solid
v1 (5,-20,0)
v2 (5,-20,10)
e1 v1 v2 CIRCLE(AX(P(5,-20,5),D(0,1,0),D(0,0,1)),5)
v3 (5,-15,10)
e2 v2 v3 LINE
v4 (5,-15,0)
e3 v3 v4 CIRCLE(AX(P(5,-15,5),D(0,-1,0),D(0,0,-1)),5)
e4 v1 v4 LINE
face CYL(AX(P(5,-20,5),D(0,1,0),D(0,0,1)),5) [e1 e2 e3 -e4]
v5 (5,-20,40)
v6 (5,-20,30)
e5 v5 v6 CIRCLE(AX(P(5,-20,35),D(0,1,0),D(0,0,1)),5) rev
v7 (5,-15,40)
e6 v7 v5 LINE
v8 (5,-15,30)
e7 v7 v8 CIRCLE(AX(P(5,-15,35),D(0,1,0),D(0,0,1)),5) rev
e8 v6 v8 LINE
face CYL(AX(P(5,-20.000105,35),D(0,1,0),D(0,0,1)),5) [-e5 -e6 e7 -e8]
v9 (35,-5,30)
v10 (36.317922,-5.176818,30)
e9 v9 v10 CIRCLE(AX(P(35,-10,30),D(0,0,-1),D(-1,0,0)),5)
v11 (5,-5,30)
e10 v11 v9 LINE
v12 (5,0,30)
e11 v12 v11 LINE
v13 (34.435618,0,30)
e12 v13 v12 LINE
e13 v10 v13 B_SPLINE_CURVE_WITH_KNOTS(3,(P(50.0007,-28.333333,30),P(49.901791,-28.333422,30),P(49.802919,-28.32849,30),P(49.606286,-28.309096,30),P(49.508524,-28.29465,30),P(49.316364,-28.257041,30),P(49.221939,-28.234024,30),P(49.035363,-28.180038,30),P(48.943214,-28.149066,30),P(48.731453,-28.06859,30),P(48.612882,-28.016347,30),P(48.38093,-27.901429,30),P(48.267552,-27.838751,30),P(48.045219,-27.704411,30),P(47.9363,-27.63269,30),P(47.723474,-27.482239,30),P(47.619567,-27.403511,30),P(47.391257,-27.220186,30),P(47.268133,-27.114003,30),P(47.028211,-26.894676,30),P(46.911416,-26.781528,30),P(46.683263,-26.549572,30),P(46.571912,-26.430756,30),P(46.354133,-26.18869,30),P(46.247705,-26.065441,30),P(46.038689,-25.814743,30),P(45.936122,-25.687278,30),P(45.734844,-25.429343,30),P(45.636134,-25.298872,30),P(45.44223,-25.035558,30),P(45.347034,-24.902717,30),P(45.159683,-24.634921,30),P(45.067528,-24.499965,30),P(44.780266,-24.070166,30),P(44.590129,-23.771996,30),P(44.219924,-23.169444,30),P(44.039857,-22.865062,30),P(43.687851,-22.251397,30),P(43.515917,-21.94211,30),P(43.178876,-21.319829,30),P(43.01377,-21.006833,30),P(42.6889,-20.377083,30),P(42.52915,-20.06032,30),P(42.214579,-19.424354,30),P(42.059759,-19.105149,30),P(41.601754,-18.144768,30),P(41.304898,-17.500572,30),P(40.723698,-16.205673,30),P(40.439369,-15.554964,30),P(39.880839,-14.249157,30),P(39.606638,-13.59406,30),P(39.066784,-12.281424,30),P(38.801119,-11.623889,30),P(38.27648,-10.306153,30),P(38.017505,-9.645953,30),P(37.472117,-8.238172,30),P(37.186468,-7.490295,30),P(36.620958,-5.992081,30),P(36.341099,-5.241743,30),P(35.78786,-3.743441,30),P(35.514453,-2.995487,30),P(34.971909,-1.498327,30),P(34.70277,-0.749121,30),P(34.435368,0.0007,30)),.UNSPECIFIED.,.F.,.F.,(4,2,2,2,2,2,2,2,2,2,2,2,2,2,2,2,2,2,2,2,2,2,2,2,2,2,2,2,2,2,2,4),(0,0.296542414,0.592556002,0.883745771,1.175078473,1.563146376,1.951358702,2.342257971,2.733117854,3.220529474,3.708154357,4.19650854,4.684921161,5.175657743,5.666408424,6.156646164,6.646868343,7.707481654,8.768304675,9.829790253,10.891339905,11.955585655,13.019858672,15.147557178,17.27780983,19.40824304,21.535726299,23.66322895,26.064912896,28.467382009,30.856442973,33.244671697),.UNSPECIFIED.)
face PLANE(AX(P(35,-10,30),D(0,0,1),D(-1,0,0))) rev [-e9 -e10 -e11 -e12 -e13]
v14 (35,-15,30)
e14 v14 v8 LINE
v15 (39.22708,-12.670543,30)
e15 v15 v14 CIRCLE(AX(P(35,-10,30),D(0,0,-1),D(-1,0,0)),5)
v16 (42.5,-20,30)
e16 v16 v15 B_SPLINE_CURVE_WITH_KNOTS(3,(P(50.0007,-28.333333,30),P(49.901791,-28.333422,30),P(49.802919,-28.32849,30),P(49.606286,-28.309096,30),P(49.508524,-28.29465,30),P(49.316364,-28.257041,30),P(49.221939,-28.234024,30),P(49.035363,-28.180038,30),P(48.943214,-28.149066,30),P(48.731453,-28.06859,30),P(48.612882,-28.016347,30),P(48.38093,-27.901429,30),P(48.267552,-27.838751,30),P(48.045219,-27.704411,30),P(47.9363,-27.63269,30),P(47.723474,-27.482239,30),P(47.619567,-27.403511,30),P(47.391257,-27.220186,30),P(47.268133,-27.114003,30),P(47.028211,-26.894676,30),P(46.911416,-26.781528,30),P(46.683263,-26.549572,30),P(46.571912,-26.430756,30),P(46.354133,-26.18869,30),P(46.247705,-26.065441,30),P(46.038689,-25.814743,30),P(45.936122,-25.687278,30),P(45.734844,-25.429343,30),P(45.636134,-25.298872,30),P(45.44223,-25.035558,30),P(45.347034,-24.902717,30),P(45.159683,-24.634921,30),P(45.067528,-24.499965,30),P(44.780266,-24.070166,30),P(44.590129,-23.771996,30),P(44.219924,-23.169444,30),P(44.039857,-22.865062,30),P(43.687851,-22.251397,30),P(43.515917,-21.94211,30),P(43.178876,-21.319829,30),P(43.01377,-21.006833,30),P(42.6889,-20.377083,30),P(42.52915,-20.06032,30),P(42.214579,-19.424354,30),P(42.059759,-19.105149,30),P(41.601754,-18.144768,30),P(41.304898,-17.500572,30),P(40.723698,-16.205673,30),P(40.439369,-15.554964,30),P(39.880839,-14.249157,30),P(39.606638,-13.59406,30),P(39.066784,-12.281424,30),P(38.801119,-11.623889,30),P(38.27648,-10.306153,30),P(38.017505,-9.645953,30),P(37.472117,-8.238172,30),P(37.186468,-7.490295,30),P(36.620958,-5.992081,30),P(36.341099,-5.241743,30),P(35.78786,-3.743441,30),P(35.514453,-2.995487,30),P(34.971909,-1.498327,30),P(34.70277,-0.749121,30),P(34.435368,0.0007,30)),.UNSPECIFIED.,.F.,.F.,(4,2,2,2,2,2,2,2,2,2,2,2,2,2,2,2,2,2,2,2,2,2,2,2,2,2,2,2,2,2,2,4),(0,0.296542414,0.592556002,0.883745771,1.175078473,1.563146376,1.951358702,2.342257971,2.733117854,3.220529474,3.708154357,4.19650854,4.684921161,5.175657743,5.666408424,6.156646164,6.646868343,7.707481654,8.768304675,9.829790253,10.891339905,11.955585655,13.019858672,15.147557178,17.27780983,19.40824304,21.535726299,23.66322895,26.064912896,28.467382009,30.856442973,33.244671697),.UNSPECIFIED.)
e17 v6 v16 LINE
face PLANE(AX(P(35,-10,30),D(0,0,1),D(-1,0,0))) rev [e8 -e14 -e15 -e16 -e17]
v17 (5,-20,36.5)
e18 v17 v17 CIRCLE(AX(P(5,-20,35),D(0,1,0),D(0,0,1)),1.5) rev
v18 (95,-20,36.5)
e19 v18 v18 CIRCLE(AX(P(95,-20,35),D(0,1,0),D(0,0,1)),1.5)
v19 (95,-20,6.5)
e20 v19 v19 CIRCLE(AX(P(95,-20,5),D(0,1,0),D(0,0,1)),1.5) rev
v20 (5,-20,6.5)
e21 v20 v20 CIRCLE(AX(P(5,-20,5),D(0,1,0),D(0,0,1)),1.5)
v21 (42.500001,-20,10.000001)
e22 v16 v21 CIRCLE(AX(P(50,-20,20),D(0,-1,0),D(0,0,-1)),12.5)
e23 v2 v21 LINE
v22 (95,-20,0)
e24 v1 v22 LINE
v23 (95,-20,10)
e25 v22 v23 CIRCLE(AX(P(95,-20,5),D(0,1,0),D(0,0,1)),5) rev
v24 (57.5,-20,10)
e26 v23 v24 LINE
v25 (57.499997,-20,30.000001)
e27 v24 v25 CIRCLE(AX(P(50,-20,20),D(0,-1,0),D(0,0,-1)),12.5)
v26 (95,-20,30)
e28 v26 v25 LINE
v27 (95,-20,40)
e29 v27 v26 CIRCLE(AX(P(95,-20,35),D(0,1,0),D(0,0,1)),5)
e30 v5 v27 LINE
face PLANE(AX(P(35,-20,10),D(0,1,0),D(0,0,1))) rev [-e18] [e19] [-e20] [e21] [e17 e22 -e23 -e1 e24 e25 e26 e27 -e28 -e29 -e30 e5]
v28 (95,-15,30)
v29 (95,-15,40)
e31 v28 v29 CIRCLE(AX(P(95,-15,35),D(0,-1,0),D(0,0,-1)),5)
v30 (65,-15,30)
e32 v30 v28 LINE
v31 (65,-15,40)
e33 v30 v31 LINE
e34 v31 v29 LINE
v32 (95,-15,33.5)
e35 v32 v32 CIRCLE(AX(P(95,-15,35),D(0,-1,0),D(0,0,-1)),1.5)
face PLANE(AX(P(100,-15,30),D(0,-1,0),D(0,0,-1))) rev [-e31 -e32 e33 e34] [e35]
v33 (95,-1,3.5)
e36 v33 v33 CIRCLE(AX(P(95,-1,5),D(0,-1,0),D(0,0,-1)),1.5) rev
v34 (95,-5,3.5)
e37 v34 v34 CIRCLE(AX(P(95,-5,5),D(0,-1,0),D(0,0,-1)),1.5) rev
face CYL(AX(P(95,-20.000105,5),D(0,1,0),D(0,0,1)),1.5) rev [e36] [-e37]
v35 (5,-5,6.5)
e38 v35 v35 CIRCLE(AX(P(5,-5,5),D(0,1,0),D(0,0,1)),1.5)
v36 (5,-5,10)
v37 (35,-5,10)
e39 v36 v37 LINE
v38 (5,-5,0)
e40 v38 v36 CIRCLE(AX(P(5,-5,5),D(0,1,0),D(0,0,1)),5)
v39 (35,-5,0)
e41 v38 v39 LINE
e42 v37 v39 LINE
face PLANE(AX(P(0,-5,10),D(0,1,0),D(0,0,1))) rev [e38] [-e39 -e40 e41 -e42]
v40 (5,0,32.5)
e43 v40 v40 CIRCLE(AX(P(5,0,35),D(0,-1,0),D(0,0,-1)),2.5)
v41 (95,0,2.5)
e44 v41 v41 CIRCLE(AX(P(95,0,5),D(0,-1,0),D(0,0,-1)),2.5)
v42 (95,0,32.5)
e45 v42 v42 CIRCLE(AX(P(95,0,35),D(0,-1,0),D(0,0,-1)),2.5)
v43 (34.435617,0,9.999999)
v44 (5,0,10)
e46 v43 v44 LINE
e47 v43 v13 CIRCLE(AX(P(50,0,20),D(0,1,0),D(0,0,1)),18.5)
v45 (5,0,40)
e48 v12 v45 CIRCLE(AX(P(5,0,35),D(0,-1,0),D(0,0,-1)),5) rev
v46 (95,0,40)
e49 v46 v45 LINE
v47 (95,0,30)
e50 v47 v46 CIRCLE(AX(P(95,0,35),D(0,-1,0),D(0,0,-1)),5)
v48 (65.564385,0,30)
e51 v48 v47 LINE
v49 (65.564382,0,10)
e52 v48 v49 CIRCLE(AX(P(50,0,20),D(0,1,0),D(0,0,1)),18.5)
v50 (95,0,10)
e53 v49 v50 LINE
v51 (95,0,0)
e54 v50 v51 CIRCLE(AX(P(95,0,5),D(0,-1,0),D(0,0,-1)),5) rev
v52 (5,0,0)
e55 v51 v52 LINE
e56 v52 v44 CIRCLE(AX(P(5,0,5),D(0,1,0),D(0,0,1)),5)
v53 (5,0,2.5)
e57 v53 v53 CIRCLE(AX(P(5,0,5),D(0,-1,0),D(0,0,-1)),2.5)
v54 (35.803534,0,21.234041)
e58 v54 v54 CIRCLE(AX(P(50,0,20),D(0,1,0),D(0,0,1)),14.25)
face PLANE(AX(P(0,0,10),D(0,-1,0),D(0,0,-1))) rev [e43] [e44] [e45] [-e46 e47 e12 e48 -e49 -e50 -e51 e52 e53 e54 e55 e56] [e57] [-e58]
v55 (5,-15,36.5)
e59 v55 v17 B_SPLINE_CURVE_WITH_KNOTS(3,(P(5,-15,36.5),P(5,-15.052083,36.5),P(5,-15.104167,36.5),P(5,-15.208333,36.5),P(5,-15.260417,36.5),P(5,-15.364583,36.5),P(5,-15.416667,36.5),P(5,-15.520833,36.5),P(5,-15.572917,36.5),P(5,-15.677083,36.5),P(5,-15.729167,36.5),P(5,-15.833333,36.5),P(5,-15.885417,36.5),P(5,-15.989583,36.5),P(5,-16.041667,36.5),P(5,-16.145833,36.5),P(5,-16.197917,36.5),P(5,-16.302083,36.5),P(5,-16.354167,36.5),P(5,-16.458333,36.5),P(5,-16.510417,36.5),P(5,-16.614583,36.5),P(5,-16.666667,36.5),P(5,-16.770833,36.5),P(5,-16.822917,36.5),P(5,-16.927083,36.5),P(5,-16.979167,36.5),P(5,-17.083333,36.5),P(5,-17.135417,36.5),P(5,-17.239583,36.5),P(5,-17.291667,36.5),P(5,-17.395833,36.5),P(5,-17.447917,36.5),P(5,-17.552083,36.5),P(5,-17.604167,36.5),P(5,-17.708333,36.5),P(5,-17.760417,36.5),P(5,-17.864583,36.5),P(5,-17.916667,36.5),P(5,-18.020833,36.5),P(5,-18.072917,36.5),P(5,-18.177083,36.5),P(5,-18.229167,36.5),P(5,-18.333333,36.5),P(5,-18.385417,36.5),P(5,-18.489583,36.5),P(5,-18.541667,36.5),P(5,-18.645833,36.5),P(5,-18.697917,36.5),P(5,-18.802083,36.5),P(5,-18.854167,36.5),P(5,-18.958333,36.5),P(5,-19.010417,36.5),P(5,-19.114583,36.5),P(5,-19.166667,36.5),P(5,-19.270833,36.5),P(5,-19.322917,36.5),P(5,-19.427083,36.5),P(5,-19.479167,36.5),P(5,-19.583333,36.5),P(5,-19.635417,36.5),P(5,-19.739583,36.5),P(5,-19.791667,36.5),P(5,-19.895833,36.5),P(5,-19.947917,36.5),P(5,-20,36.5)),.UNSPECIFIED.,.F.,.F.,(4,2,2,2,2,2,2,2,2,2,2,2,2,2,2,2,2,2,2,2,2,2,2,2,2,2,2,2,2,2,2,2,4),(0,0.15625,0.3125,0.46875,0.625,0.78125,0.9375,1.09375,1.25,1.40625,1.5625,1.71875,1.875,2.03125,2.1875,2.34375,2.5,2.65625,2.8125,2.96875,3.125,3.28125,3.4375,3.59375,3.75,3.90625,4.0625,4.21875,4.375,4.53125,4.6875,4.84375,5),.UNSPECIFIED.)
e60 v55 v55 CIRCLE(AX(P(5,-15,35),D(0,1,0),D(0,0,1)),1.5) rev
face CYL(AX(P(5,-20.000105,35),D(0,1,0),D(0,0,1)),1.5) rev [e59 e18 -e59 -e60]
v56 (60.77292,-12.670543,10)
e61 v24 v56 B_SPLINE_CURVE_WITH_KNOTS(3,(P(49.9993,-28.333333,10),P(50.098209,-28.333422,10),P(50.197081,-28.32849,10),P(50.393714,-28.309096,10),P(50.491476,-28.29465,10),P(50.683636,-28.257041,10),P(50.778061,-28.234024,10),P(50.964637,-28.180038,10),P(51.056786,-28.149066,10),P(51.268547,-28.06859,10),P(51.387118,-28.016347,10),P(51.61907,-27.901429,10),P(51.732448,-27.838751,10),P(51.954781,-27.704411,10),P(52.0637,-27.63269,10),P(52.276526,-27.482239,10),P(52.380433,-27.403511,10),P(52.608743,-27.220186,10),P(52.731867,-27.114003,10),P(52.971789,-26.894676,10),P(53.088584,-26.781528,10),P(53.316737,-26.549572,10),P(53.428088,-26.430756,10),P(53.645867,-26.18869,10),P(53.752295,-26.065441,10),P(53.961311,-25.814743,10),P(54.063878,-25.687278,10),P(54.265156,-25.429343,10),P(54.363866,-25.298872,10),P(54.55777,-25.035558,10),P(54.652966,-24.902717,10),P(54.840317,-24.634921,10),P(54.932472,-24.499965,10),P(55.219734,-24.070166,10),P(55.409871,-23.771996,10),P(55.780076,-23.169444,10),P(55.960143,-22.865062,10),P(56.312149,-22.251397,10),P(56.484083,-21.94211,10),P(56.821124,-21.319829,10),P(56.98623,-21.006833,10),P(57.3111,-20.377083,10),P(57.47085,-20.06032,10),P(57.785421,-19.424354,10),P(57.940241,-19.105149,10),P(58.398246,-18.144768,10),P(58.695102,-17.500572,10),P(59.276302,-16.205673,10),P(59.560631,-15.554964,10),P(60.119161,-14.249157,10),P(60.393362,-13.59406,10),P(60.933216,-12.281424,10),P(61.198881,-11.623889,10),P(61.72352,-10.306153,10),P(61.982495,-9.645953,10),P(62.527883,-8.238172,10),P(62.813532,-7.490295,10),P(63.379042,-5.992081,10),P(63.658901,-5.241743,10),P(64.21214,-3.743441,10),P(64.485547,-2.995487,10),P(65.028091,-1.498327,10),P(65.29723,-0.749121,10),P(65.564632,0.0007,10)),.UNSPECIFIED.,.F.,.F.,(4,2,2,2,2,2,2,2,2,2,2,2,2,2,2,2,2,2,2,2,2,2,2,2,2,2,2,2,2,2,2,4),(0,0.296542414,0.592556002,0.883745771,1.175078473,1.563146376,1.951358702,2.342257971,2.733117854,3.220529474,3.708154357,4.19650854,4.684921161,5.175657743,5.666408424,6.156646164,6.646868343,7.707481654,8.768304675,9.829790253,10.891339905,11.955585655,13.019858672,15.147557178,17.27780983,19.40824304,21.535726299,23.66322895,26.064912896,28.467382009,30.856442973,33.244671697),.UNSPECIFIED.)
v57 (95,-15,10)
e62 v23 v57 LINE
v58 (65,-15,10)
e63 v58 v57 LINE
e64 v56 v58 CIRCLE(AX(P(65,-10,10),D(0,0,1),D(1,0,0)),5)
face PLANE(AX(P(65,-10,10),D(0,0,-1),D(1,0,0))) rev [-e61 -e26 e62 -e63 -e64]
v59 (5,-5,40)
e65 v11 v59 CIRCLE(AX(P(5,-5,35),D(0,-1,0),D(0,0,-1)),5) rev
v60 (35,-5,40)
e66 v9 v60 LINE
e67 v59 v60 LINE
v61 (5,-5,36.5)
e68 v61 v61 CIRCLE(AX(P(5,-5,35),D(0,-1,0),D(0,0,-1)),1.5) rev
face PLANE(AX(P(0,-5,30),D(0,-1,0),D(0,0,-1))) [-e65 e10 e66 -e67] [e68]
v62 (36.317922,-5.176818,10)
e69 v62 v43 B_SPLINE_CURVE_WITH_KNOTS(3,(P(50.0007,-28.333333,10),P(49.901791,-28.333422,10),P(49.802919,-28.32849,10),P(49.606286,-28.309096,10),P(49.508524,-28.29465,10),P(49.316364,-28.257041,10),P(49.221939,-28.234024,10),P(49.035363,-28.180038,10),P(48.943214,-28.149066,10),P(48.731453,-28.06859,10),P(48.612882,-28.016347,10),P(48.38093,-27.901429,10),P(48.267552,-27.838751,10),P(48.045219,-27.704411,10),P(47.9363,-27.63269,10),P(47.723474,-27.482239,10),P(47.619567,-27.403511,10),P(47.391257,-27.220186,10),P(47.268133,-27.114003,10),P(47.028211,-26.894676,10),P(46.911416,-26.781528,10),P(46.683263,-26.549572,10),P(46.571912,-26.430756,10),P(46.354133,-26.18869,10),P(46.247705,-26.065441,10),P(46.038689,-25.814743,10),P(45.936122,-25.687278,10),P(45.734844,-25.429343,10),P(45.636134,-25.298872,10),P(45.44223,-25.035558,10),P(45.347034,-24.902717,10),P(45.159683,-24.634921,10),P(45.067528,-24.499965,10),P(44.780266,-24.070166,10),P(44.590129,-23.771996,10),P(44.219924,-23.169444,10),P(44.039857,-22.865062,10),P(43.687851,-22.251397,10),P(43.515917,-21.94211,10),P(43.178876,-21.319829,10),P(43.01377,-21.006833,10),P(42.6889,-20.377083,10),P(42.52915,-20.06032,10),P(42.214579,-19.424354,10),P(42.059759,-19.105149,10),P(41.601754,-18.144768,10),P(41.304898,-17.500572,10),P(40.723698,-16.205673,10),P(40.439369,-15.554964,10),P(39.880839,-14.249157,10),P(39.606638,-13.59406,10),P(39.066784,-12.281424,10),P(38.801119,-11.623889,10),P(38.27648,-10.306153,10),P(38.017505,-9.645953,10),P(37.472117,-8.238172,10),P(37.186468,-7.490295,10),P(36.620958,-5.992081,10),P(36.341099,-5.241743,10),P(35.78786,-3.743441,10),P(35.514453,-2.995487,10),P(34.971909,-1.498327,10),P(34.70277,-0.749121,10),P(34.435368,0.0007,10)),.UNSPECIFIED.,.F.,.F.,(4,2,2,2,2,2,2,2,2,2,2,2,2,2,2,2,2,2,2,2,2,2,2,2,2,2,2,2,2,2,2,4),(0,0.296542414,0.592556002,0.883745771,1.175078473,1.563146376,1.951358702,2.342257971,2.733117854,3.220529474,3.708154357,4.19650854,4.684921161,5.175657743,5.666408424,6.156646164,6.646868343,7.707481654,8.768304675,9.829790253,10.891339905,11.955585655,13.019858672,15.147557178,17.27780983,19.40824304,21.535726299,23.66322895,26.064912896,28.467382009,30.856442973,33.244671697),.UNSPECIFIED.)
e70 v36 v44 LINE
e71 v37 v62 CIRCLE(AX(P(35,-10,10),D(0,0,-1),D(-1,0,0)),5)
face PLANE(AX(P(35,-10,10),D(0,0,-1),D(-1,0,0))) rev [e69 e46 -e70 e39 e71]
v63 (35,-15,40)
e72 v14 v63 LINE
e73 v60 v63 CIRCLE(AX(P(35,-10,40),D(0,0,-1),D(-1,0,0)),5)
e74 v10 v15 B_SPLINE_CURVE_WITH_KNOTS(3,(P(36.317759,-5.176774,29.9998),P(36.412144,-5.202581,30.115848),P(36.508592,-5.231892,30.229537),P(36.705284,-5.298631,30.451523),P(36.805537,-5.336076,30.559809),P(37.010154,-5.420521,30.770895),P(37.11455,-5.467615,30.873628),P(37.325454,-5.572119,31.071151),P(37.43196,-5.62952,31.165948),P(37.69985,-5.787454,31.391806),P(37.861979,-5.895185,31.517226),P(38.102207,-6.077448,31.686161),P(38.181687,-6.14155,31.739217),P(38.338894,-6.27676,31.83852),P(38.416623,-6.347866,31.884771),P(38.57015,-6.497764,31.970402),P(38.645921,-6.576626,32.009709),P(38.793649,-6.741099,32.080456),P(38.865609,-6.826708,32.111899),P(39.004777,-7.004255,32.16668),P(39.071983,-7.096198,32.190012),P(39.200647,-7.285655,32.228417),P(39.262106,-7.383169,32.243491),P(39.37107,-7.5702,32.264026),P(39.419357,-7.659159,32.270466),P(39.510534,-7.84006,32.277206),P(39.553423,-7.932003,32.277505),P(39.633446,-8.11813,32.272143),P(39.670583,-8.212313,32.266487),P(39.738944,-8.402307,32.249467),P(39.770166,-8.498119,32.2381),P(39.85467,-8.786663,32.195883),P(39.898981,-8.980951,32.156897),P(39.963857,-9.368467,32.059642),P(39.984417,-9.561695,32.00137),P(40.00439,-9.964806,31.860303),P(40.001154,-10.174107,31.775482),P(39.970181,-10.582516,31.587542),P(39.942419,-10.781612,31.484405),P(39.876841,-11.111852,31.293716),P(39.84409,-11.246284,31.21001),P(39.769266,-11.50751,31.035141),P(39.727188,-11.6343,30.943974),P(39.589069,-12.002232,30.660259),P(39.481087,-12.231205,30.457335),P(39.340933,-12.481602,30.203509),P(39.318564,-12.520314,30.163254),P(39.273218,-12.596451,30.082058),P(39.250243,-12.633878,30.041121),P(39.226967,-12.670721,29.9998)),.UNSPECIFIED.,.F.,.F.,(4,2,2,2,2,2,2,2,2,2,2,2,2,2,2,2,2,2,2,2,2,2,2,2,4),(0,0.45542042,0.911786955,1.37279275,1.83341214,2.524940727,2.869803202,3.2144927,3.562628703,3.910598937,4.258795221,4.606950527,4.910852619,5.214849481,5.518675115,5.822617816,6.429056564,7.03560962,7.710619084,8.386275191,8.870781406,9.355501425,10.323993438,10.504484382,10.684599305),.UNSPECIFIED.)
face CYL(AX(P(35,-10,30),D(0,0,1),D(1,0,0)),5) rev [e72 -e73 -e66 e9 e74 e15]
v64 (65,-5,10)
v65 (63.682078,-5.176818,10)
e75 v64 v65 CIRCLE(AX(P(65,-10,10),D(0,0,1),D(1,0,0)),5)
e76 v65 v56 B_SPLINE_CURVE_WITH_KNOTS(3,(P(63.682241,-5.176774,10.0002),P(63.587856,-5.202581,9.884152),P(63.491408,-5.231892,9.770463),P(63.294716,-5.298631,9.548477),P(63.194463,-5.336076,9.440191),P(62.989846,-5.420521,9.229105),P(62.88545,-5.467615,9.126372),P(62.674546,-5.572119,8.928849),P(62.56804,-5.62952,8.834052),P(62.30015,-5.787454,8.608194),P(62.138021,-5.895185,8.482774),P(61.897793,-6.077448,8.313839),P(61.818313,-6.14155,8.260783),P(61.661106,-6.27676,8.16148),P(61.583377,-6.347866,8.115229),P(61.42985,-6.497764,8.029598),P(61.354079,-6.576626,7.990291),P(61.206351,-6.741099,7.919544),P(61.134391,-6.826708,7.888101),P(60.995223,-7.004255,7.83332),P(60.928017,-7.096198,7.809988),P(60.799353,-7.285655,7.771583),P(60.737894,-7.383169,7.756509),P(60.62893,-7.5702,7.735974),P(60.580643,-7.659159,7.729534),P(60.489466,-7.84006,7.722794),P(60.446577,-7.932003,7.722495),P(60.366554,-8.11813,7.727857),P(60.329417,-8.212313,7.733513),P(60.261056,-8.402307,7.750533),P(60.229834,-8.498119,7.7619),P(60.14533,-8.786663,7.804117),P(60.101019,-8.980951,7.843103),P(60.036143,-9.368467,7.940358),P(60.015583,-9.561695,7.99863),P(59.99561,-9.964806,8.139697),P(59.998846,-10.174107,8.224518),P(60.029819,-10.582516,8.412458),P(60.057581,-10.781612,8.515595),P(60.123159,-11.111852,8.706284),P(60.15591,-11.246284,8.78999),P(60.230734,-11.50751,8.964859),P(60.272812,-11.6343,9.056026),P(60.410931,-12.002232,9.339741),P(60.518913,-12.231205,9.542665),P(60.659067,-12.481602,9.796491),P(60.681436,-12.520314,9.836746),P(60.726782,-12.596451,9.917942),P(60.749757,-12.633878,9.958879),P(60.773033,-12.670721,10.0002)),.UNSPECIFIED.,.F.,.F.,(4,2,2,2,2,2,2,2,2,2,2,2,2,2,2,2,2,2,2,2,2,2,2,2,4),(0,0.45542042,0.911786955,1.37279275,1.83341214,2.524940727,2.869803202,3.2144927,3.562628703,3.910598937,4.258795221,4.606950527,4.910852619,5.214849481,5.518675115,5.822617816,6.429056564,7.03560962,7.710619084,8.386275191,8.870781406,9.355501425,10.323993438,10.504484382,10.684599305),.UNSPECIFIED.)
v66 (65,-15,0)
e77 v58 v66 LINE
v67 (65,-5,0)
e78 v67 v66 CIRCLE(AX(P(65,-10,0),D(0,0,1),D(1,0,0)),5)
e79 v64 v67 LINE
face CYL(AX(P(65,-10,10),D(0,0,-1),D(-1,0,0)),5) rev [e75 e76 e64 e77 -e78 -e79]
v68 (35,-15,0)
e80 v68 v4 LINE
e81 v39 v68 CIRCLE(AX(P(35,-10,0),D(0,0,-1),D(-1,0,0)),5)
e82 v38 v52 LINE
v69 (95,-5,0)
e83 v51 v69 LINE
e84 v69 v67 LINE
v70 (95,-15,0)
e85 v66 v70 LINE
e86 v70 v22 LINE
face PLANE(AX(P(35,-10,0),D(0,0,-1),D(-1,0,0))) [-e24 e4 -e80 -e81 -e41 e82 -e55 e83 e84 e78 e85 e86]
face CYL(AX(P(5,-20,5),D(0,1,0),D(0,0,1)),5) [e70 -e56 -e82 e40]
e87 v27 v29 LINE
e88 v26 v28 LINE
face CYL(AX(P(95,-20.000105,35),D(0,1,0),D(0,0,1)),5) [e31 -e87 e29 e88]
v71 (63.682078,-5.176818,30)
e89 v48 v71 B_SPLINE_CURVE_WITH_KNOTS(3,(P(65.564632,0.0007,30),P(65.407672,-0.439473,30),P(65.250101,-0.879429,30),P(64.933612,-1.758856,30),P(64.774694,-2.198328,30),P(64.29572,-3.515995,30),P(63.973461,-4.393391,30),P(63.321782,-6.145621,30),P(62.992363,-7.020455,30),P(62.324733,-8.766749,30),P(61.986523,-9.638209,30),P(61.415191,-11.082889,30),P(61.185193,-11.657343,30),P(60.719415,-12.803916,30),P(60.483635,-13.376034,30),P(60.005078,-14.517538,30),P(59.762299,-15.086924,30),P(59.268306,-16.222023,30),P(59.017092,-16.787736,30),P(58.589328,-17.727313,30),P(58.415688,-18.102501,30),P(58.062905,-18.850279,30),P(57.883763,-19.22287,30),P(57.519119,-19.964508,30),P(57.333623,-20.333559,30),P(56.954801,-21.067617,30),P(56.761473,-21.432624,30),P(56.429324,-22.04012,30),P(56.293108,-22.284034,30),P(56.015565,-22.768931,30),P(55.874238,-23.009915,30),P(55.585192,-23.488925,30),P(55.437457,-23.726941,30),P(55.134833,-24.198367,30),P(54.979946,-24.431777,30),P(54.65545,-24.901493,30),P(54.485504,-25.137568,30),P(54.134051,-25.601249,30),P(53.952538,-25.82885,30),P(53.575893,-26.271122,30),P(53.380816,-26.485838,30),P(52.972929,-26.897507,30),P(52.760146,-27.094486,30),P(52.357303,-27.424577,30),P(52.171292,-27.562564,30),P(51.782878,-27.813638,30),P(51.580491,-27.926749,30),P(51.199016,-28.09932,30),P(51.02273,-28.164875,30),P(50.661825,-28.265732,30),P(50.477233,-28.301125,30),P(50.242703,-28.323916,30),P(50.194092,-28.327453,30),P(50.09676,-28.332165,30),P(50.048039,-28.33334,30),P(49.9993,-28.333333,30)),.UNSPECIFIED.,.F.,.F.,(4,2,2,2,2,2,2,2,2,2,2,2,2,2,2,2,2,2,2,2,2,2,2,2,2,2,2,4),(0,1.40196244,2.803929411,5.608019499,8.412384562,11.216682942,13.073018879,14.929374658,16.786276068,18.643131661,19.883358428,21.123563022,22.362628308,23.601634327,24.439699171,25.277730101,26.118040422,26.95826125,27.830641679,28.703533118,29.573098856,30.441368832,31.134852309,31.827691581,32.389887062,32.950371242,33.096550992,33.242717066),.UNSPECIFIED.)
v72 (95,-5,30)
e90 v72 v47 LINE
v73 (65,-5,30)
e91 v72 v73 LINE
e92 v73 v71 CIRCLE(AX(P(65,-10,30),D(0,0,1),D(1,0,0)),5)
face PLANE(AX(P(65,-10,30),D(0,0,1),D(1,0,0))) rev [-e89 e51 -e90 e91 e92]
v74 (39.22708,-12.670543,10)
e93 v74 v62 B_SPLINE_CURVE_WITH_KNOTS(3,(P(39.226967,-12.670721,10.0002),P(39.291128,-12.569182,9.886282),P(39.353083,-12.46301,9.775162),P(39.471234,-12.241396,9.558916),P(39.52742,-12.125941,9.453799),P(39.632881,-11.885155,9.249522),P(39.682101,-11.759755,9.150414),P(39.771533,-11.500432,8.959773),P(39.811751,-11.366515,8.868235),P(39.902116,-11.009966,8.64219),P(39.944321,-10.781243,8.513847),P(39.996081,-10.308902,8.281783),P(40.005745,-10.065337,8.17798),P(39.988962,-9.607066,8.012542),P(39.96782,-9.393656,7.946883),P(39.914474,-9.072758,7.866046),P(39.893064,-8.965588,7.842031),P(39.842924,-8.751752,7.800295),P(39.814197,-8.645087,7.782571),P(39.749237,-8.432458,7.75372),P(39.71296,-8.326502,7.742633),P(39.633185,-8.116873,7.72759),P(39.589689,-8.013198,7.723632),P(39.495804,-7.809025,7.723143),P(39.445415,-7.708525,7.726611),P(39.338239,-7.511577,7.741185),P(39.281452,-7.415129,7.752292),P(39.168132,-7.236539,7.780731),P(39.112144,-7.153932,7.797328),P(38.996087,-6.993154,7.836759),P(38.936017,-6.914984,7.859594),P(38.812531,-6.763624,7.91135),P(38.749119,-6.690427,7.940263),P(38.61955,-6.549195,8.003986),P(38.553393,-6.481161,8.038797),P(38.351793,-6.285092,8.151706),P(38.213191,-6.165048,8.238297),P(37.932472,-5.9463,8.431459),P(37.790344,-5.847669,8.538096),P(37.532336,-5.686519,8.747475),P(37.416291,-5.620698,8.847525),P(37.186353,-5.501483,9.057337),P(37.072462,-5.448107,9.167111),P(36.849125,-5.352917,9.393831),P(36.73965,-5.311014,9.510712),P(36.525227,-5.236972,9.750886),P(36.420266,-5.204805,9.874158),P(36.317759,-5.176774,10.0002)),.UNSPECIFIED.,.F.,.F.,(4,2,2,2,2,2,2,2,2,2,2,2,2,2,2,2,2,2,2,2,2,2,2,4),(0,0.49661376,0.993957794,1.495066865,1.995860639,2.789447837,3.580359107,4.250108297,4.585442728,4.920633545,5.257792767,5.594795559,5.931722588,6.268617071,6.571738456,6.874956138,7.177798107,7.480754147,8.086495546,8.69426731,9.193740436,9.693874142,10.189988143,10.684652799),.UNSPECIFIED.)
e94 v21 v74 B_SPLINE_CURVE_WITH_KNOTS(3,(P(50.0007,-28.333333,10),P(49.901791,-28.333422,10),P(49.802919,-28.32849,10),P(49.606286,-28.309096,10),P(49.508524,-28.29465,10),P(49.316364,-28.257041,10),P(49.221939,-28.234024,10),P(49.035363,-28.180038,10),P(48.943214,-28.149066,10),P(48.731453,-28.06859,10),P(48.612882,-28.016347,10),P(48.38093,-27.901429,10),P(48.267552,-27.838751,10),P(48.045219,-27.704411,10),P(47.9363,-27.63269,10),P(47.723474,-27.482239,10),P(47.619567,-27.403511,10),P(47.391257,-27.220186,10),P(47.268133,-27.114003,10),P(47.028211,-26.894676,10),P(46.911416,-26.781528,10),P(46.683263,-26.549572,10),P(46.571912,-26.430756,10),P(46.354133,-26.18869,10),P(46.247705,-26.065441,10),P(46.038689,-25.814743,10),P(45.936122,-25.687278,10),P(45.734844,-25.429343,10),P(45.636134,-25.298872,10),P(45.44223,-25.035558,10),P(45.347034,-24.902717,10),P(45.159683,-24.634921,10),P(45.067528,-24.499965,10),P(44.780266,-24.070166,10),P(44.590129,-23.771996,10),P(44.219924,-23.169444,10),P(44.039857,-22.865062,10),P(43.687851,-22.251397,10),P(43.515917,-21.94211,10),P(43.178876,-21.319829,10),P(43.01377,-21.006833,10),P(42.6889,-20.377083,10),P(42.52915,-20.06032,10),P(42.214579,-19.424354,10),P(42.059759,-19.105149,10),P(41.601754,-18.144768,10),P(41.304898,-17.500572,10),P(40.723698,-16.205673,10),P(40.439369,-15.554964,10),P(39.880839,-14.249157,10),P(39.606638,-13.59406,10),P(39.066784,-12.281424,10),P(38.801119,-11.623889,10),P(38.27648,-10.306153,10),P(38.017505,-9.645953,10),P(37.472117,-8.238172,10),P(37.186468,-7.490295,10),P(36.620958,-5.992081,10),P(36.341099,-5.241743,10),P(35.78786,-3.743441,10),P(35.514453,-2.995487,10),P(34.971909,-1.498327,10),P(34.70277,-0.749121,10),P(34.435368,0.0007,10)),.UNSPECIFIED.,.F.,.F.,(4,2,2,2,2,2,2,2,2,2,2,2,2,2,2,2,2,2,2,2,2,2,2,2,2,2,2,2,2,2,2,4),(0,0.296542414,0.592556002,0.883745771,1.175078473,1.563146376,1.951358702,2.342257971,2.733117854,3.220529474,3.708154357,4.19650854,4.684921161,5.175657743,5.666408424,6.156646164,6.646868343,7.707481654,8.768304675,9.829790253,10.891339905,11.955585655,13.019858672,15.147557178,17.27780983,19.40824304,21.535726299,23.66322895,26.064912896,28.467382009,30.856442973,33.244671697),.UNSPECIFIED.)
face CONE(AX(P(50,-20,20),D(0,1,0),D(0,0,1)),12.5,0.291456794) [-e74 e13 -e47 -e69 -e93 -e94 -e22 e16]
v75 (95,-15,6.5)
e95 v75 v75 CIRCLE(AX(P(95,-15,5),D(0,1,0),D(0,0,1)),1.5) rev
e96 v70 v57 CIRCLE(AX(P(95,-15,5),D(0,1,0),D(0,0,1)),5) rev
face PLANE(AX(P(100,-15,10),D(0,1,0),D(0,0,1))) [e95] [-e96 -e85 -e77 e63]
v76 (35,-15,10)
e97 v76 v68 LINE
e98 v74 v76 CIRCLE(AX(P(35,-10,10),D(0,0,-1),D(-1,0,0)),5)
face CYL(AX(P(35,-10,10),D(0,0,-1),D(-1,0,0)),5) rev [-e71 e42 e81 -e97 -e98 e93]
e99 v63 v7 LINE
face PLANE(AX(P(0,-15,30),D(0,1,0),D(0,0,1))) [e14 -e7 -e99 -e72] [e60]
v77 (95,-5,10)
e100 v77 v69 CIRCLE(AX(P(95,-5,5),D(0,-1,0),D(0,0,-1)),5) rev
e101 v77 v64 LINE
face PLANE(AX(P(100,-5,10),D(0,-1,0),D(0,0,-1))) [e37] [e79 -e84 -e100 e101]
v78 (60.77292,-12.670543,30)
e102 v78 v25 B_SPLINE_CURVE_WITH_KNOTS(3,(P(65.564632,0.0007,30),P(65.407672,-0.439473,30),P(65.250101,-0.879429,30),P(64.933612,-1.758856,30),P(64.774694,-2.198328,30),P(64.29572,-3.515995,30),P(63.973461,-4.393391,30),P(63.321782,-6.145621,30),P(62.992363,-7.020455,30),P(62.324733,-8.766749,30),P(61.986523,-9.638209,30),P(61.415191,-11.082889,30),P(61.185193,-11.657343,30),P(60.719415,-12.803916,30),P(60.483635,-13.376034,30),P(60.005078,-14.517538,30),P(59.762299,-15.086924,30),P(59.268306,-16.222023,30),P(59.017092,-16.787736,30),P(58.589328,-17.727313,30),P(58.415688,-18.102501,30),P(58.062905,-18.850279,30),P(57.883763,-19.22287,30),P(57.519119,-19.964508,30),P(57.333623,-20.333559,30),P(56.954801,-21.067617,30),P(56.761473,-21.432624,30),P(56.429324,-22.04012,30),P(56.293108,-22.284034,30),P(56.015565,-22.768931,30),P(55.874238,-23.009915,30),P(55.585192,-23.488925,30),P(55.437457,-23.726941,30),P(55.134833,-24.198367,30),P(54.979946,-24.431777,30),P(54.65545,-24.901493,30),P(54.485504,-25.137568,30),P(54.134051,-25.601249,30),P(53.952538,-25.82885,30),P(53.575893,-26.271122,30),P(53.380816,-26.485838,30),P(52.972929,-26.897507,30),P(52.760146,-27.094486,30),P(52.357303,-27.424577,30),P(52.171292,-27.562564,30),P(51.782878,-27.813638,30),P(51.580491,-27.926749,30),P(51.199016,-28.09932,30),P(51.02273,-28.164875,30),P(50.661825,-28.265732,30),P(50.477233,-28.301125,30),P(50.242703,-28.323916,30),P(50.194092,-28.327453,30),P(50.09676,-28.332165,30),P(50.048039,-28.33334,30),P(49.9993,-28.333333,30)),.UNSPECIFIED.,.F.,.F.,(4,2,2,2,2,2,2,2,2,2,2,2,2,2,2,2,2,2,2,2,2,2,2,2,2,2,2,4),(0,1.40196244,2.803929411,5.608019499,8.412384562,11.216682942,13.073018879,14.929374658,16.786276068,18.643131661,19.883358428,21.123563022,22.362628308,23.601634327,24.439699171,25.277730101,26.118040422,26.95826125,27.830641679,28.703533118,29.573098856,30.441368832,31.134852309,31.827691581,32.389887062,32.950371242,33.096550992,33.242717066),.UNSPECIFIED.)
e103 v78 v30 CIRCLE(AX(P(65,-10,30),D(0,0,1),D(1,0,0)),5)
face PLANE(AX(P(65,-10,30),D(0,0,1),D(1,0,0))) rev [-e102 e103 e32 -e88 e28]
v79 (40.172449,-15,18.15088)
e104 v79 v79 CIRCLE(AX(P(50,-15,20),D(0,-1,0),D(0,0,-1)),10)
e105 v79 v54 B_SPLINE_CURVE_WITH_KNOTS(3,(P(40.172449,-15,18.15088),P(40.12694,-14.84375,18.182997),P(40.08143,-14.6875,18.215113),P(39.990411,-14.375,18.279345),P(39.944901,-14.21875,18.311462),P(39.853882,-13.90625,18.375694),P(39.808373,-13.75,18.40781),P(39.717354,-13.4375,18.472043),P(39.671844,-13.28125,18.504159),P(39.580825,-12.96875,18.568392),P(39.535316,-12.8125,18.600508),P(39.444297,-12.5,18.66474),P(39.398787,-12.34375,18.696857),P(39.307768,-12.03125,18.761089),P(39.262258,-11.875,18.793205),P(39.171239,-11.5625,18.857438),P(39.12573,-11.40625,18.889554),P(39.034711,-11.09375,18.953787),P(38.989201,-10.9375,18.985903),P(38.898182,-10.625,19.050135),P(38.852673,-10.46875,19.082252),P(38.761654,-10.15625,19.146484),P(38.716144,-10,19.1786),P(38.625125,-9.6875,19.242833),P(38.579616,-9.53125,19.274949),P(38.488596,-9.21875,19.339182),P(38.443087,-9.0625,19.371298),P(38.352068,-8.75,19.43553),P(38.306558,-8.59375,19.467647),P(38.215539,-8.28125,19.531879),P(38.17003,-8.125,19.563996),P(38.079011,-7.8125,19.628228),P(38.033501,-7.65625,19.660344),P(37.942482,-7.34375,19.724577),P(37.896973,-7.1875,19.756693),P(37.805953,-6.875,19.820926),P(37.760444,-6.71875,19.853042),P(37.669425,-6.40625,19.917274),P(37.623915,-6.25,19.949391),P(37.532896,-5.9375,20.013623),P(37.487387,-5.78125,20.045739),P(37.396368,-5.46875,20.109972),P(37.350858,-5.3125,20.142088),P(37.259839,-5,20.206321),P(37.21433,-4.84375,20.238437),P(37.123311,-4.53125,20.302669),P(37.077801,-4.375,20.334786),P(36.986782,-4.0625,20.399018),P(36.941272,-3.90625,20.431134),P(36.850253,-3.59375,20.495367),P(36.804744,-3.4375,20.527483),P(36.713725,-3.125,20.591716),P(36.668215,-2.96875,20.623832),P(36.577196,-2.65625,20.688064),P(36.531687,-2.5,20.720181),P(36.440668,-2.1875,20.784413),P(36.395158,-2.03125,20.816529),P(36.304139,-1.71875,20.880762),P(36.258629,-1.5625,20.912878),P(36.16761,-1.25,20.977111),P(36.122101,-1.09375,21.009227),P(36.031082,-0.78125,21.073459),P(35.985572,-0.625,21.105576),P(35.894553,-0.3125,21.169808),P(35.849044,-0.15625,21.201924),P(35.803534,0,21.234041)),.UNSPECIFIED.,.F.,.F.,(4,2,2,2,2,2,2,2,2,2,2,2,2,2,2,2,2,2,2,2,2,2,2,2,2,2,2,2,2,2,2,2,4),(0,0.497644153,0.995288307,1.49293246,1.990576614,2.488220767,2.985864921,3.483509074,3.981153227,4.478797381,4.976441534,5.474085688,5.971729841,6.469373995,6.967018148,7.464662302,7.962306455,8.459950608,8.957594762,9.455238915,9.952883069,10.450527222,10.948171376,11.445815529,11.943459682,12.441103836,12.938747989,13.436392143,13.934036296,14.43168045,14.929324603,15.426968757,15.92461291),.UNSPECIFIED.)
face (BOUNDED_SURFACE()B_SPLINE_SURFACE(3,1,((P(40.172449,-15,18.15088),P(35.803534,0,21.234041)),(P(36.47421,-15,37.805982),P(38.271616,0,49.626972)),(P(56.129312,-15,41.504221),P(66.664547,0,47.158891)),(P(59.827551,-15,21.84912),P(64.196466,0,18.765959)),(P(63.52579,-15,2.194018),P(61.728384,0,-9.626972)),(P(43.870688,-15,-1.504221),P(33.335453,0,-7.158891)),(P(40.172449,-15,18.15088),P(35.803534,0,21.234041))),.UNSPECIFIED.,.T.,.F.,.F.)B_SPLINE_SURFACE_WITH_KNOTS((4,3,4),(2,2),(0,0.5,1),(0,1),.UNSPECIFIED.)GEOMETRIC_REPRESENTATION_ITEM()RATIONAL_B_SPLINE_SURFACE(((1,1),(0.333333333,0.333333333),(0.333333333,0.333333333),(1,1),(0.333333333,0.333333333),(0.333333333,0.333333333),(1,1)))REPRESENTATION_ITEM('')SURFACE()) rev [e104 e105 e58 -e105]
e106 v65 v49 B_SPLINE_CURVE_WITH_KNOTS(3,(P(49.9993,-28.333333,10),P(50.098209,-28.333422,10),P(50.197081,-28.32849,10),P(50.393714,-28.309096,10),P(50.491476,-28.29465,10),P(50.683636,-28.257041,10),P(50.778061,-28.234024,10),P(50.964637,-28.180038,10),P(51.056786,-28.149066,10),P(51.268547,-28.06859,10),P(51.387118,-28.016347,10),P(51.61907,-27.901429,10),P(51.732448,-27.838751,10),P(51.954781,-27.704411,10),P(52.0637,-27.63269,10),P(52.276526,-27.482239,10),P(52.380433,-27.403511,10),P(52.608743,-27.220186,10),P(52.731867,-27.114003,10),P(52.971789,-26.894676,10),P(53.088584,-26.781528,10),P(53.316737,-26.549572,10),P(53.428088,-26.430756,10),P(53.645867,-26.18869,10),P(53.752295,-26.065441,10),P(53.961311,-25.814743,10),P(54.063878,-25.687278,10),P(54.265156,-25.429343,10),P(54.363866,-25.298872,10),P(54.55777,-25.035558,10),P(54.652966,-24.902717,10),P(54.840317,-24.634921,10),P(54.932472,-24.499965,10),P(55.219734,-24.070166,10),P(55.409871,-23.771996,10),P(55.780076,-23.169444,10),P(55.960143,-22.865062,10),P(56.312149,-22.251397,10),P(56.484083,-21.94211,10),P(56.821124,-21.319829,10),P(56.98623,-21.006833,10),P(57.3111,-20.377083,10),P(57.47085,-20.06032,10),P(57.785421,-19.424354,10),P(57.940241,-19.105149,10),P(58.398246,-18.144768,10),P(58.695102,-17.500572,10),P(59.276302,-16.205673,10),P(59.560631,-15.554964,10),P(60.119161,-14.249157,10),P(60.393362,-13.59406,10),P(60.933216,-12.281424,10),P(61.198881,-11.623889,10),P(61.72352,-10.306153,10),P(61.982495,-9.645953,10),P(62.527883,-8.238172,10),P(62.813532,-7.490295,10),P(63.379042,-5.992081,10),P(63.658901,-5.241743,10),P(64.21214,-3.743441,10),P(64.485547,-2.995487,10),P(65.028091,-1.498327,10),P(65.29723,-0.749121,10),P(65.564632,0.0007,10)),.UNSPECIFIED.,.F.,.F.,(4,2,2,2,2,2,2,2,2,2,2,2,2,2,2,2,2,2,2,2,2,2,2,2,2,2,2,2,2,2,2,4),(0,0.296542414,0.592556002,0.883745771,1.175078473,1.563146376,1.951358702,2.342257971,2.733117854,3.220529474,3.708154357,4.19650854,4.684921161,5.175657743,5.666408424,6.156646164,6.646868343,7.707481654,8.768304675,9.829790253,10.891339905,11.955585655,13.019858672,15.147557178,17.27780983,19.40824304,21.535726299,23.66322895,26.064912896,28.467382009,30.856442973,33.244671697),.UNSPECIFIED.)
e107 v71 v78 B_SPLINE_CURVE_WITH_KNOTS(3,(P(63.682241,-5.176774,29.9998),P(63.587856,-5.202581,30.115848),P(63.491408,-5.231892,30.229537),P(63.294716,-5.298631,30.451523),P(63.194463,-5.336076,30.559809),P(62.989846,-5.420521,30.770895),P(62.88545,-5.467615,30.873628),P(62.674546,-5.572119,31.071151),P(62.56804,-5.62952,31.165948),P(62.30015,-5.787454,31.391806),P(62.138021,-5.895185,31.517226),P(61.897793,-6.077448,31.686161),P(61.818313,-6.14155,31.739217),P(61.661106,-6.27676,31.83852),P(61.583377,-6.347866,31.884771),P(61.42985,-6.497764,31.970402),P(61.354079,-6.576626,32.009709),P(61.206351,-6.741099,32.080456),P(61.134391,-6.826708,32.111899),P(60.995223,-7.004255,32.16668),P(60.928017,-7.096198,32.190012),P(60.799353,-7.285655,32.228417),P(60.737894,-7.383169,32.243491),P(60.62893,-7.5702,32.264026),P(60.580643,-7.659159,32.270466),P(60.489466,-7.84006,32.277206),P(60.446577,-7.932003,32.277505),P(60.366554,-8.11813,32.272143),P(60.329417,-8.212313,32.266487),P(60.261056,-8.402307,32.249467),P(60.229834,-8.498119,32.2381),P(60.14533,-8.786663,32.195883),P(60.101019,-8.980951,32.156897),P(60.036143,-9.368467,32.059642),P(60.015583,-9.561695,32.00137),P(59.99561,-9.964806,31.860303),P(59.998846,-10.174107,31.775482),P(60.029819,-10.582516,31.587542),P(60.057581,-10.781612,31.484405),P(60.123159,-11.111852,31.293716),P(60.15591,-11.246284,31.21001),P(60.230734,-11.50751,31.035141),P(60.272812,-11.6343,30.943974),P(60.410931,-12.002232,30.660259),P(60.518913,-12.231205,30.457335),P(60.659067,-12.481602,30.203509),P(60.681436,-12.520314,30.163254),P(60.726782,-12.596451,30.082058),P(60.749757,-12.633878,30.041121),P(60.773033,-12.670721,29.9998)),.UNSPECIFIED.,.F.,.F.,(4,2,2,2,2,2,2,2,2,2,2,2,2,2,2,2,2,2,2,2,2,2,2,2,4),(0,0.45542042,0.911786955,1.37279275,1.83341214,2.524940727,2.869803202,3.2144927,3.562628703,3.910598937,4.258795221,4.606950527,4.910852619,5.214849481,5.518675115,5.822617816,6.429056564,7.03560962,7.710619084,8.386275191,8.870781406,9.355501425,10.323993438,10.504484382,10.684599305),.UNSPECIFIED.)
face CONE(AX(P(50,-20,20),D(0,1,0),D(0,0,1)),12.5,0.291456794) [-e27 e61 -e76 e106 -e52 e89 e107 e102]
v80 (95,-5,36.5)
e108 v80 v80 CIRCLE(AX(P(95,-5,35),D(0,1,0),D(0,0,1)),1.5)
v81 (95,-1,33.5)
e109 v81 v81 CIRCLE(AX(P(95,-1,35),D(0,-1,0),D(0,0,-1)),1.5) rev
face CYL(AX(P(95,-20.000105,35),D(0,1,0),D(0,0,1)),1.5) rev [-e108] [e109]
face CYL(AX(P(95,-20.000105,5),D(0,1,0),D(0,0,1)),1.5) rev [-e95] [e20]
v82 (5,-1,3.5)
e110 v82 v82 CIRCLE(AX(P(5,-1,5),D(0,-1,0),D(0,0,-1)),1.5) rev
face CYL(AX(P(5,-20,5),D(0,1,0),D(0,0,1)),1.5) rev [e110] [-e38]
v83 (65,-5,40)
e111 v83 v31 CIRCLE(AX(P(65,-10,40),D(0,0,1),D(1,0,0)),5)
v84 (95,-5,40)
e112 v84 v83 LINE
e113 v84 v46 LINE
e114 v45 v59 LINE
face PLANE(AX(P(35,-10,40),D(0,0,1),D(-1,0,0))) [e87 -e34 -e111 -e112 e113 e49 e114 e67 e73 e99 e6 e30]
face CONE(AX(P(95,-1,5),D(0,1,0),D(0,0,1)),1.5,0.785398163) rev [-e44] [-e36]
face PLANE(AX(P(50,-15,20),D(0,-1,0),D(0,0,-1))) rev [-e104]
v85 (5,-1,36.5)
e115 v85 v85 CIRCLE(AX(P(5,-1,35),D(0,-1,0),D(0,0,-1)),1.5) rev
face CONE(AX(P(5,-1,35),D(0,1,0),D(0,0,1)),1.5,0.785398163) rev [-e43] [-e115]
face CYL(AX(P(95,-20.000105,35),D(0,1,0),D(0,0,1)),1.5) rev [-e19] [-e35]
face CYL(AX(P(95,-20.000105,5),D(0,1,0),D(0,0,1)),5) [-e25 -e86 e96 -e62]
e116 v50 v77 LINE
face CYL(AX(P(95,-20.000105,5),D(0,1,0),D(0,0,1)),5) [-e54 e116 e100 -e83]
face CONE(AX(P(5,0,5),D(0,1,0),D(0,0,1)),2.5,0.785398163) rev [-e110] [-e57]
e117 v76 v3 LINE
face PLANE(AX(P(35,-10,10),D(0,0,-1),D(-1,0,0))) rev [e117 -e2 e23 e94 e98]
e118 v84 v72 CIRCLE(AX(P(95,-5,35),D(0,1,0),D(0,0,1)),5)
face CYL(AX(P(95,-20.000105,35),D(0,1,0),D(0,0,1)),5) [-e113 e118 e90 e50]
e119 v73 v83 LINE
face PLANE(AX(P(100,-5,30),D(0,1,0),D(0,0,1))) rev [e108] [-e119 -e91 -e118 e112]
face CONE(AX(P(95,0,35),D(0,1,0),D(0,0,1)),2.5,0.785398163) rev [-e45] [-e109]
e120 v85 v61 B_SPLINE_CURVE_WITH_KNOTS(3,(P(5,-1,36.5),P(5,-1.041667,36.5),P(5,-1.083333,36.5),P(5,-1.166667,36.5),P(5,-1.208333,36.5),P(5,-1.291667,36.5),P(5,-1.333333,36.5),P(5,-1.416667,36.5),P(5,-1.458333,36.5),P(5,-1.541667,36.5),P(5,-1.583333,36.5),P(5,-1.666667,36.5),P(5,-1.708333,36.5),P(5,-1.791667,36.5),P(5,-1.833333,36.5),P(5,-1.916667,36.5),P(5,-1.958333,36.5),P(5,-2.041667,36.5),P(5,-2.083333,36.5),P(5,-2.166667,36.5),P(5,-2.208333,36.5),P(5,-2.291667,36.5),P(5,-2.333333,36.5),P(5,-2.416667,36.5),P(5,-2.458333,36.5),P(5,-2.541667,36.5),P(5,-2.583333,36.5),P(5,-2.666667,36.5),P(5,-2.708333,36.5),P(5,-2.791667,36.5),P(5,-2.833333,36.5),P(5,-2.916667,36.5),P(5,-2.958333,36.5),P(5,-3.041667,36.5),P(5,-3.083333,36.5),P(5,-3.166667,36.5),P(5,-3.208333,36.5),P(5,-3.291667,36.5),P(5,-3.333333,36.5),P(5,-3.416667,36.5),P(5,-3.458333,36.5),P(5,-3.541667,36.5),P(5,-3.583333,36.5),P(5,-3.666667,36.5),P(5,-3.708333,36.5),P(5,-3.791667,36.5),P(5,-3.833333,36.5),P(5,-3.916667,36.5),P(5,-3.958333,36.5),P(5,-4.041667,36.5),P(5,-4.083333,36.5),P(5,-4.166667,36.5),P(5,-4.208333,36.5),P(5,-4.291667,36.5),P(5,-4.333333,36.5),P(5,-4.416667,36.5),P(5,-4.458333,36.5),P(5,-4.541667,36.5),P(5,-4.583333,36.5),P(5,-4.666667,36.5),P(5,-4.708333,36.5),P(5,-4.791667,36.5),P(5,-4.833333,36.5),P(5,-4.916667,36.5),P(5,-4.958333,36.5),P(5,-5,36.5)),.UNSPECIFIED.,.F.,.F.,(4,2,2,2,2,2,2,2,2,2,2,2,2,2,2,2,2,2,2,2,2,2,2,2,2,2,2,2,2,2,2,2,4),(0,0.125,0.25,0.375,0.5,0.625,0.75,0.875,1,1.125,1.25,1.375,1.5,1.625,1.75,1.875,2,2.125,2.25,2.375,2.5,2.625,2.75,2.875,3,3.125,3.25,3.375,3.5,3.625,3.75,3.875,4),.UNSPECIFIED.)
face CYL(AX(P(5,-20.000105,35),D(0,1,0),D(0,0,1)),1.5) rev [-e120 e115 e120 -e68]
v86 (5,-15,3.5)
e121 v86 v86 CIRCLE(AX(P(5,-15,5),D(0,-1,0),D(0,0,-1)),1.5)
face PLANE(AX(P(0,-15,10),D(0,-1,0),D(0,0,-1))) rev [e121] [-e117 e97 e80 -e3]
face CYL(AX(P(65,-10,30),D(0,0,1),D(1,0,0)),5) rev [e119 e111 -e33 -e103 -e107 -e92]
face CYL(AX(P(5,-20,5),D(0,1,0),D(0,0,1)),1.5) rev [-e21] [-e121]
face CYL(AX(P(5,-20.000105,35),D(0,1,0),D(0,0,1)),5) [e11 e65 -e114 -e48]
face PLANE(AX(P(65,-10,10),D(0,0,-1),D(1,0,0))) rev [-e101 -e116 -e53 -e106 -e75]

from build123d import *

# Parameters (mm, degrees)
BOSS_EXTRU_1_DEPTH        = 10
ESQUISSE9_R               = 1.5
ENL_V_MAT_EXTRU_1_DEPTH   = 51.249378106
ESQUISSE4_R               = 12.5
ESQUISSE3_R               = 18.5
SYM_TRIE3_COPY_1_DEPTH    = 10
SYM_TRIE3_COPY_2_SKETCH_R = 1.5
SYM_TRIE3_COPY_2_DEPTH    = 51.249378106
CHANFREIN1_SIZE           = 1
BOSS_EXTRU_2_DEPTH        = 10


with BuildPart() as part:
    # Esquisse1 → Boss.-Extru.1 (new body)
    with BuildSketch(Plane.XY):
        with BuildLine():
            Line((0, 0), (35, 0))
            Line((35, 0), (45, 0))
            Line((45, 0), (45, -20))
            Line((45, -20), (35, -20))
            Line((35, -20), (0, -20))
            Line((0, -20), (0, -15))
            Line((0, -15), (35, -15))
            ThreePointArc((35, -15), (40, -10), (35, -5))
            Line((35, -5), (0, -5))
            Line((0, -5), (0, 0))
        make_face()
    boss_extru_1 = extrude(amount=BOSS_EXTRU_1_DEPTH)

    # Esquisse9 → Enlèv. mat.-Extru.1 (cut, symmetric)
    with BuildSketch(Plane(origin=(0, 0, 0), x_dir=(1, 0, 0), z_dir=(0, 1, 0))):
        with BuildLine():
            ThreePointArc((0, -5), (1.464466094, -1.464466094), (5, 0))
            Line((5, 0), (0, 0))
            Line((0, 0), (0, -5))
        make_face()
        with BuildLine():
            ThreePointArc((5, -10), (1.464466094, -8.535533906), (0, -5))
            Line((0, -5), (0, -10))
            Line((0, -10), (5, -10))
        make_face()
        with Locations(Location((5, -5, 0), (0, 0, 270))):
            Circle(ESQUISSE9_R)
    enl_v_mat_extru_1 = extrude(amount=ENL_V_MAT_EXTRU_1_DEPTH, both=True, mode=Mode.SUBTRACT)

    # Esquisse4 → Lissage2 section 0
    with BuildSketch(Plane.XZ.offset(20)):
        with Locations((50, 20)):
            Circle(ESQUISSE4_R)
    # Esquisse3 → Lissage2 section 1
    with BuildSketch(Plane(origin=(0, 0, 0), x_dir=(1, 0, 0), z_dir=(0, 1, 0))):
        with Locations((50, -20)):
            Circle(ESQUISSE3_R)
    loft()

    # Symétrie2: Boss.-Extru.1, Enlèv. mat.-Extru.1 across plane
    add(boss_extru_1.mirror(Plane.XY.offset(20)))
    add(enl_v_mat_extru_1.mirror(Plane.XY.offset(20)), mode=Mode.SUBTRACT)

    # Symétrie3: Boss.-Extru.1, Enlèv. mat.-Extru.1 across plane
    add(boss_extru_1.mirror(Plane(origin=(50, 0, 0), x_dir=(0, 0, 1), z_dir=(1, 0, 0))))
    add(enl_v_mat_extru_1.mirror(Plane(origin=(50, 0, 0), x_dir=(0, 0, 1), z_dir=(1, 0, 0))), mode=Mode.SUBTRACT)

    # Symétrie3 copy 1 sketch → Symétrie3 copy 1 (add)
    with BuildSketch(Plane(origin=(100, 0, 40), x_dir=(-1, 0, 0), z_dir=(0, 0, -1))):
        with BuildLine():
            Line((0, 0), (35, 0))
            Line((35, 0), (45, 0))
            Line((45, 0), (45, -20))
            Line((45, -20), (35, -20))
            Line((35, -20), (0, -20))
            Line((0, -20), (0, -15))
            Line((0, -15), (35, -15))
            ThreePointArc((35, -15), (40, -10), (35, -5))
            Line((35, -5), (0, -5))
            Line((0, -5), (0, 0))
        make_face()
    extrude(amount=SYM_TRIE3_COPY_1_DEPTH)

    # Symétrie3 copy 2 sketch → Symétrie3 copy 2 (cut, symmetric)
    with BuildSketch(Plane(origin=(100, 0, 40), x_dir=(-1, 0, 0), z_dir=(0, 1, 0))):
        with BuildLine():
            ThreePointArc((0, -5), (1.464466094, -1.464466094), (5, 0))
            Line((5, 0), (0, 0))
            Line((0, 0), (0, -5))
        make_face()
        with BuildLine():
            ThreePointArc((5, -10), (1.464466094, -8.535533906), (0, -5))
            Line((0, -5), (0, -10))
            Line((0, -10), (5, -10))
        make_face()
        with Locations(Location((5, -5, 0), (0, 0, 270))):
            Circle(SYM_TRIE3_COPY_2_SKETCH_R)
    extrude(amount=SYM_TRIE3_COPY_2_DEPTH, both=True, mode=Mode.SUBTRACT)

    # Chanfrein1
    chanfrein1_edges = [part.edges().sort_by_distance(p)[0] for p in [
        (5, 0, 36.5),
        (95, 0, 36.5),
        (95, 0, 3.5),
        (5, 0, 3.5),
    ]]
    chamfer(chanfrein1_edges, length=CHANFREIN1_SIZE)


with BuildPart() as boss_extru_2_tool:
    # Esquisse10 → Boss.-Extru.2 (new body)
    with BuildSketch(Plane.ZY.offset(-55)):
        with BuildLine():
            Line((31.456439237, -20), (40, -20))
            Line((40, -20), (40, 0))
            Line((40, 0), (37.811513131, 0))
            add(Edge.make_bspline(
                [(37.811513131, 0), (36.770961966, -3.339421755), (35.724642409, -6.676958136), (33.611133104, -13.345209566), (32.544444679, -16.67608847), (31.456439237, -20)],
                knots=[0, 0, 0, 0, 0.5, 0.5, 1, 1, 1, 1], degree=3))
        make_face()
        with BuildLine():
            Line((0, -20), (8.543560763, -20))
            add(Edge.make_bspline(
                [(8.543560763, -20), (7.455555321, -16.67608847), (6.388866896, -13.345209566), (4.275357591, -6.676958136), (3.229038034, -3.339421755), (2.188486869, 0)],
                knots=[0, 0, 0, 0, 0.5, 0.5, 1, 1, 1, 1], degree=3))
            Line((2.188486869, 0), (0, 0))
            Line((0, 0), (0, -20))
        make_face()
    extrude(amount=BOSS_EXTRU_2_DEPTH)


with BuildPart() as part_1:
    add(part.part)


with BuildPart() as part_2:
    # Boss.-Extru.2: joined with boss_extru_2_tool
    add(part_1.part.fuse(boss_extru_2_tool.part, tol=0.00001))

    # Enlèvement de matière-Lissage1: read off the stored shape, not the designer's step
    # Enlèvement de matière-Lissage1: loft between two sections, ruled curve by curve
    enl_vement_de_mati_re_lissage1_from = [
        Edge.make_bspline([(40.172449115, -15, 18.150880317), (36.47420975, -15, 37.805982088), (56.12931152, -15, 41.504221453), (59.827550885, -15, 21.849119683), (63.52579025, -15, 2.194017912), (43.87068848, -15, -1.504221453), (40.172449115, -15, 18.150880317)], [0, 0, 0, 0, 0.5, 0.5, 0.5, 1, 1, 1, 1], 3, [1, 0.333333333, 0.333333333, 1, 0.333333333, 0.333333333, 1]),
    ]
    enl_vement_de_mati_re_lissage1_to = [
        Edge.make_bspline([(35.80353412, 0, 21.234040725), (38.271615569, 0, 49.626972485), (66.66454733, 0, 47.158891036), (64.19646588, 0, 18.765959275), (61.728384431, 0, -9.626972485), (33.33545267, 0, -7.158891036), (35.80353412, 0, 21.234040725)], [0, 0, 0, 0, 0.5, 0.5, 0.5, 1, 1, 1, 1], 3, [1, 0.333333333, 0.333333333, 1, 0.333333333, 0.333333333, 1]),
    ]
    enl_vement_de_mati_re_lissage1 = Solid(Shell([*[Face.make_surface_from_curves(enl_vement_de_mati_re_lissage1_from[k], enl_vement_de_mati_re_lissage1_to[k]) for k in range(1)], Face(Wire(enl_vement_de_mati_re_lissage1_from)), Face(Wire(enl_vement_de_mati_re_lissage1_to))]))
    add(enl_vement_de_mati_re_lissage1, mode=Mode.SUBTRACT)


solid = part_2.part
